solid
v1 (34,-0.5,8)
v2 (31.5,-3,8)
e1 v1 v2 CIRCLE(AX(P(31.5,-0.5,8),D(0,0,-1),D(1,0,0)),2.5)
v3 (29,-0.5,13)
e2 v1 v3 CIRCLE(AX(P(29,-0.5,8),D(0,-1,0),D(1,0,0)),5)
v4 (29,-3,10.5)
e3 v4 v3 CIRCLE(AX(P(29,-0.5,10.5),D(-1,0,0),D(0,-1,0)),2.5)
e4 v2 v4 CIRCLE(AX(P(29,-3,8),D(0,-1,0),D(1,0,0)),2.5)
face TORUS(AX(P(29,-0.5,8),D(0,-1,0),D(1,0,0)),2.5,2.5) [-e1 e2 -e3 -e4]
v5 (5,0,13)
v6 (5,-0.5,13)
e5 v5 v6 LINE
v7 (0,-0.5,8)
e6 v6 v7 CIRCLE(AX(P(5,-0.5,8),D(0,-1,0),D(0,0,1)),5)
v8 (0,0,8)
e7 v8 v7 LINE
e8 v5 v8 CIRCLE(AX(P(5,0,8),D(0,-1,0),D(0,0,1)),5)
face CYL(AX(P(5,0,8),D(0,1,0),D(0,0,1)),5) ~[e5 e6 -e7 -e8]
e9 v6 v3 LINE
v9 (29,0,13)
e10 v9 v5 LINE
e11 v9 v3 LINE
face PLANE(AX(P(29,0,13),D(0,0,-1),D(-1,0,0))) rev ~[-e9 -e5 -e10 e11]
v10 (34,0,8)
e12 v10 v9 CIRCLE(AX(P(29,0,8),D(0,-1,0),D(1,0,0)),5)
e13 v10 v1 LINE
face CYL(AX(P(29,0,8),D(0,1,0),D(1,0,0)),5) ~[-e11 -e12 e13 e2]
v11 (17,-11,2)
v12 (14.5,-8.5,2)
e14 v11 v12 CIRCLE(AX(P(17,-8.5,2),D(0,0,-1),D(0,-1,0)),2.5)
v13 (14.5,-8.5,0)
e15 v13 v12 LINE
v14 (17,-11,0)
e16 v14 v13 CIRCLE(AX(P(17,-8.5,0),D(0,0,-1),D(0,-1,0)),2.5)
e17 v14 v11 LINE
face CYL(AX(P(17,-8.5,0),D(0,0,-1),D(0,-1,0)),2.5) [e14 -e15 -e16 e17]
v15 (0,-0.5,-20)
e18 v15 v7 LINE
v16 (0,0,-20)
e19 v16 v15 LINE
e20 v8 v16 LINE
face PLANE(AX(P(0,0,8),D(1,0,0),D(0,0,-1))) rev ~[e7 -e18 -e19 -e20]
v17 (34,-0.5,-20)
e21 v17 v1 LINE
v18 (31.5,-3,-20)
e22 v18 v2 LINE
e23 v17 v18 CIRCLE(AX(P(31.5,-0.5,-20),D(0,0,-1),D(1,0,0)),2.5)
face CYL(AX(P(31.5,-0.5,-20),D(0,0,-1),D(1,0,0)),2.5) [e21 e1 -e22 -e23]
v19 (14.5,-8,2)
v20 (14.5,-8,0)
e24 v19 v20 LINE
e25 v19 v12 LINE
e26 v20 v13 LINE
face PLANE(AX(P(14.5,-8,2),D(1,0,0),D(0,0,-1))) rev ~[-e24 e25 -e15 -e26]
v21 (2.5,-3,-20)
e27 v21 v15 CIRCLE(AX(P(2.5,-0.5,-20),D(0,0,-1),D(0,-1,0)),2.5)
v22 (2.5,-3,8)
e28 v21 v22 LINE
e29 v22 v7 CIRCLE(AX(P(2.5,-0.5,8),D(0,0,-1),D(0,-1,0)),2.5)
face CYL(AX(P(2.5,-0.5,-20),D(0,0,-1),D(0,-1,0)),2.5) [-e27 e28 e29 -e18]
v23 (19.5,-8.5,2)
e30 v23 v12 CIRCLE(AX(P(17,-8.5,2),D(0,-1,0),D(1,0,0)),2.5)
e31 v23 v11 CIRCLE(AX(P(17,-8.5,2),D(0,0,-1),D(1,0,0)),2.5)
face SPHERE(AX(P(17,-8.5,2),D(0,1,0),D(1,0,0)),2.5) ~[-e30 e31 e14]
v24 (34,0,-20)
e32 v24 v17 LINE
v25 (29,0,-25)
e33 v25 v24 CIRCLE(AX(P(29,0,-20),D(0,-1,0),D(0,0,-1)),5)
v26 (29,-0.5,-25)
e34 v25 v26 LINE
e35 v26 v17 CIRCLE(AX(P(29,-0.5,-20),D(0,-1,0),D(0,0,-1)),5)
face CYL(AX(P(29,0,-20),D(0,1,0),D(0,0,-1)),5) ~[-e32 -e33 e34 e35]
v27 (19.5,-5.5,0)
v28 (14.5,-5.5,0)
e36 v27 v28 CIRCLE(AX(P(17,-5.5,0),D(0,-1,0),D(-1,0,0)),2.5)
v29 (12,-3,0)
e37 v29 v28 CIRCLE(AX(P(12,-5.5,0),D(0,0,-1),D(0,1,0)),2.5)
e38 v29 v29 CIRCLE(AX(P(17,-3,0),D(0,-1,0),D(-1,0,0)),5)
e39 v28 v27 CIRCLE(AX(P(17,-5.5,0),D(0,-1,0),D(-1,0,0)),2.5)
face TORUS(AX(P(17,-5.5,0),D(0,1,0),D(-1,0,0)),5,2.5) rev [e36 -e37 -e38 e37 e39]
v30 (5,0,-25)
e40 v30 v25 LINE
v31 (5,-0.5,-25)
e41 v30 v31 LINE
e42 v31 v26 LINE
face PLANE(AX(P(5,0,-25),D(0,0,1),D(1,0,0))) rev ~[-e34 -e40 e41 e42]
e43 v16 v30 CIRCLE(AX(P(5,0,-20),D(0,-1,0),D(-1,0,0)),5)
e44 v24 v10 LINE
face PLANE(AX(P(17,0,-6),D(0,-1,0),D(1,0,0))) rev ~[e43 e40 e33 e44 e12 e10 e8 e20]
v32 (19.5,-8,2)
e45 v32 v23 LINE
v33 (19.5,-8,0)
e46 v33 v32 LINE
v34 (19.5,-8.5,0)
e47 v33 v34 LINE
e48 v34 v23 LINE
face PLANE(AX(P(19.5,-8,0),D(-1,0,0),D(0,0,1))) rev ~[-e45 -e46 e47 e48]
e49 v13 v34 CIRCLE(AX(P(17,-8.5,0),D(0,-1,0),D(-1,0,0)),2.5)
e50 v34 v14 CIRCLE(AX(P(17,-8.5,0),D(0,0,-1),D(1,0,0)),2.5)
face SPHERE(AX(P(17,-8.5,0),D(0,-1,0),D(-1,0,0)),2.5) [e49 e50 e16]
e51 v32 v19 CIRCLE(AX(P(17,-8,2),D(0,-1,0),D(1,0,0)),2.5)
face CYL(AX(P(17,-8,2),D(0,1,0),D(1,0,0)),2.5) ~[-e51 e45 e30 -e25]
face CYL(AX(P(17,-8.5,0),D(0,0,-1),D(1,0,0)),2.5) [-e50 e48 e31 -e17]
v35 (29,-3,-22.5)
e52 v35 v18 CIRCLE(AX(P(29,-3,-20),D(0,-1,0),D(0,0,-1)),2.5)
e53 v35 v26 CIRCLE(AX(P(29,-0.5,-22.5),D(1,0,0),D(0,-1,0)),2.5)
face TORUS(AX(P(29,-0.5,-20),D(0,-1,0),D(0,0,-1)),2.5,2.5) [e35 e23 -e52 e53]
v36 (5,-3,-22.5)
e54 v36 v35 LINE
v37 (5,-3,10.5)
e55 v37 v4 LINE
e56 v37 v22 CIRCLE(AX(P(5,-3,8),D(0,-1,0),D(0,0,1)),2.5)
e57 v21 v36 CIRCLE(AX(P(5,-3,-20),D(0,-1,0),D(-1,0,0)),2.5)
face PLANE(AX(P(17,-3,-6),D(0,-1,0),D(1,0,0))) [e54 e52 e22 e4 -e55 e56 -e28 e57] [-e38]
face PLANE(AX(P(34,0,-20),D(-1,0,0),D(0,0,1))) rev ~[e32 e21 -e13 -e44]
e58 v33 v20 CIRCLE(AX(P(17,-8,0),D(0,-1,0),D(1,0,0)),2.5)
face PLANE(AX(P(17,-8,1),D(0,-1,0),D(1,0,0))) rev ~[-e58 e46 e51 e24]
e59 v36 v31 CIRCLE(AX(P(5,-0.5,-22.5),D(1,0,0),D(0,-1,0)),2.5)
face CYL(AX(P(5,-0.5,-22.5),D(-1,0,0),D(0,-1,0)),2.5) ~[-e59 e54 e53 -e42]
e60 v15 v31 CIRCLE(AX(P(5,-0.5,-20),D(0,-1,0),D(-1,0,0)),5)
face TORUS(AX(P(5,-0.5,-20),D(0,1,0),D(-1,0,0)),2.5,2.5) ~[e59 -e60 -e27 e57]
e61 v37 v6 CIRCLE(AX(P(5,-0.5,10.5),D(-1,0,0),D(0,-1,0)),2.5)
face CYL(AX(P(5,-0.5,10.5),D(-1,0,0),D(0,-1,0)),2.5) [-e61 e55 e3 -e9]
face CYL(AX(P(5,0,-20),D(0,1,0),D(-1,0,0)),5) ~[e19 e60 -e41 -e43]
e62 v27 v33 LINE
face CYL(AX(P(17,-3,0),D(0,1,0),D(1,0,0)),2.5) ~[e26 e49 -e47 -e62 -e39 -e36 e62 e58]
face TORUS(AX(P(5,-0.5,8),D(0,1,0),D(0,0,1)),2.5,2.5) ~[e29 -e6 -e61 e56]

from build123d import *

# Parameters (mm, degrees)
F1_DEPTH     = 3
F3_DEPTH     = 5
F5_DEPTH     = 3
F6_T3_DEPTH  = 28
F6_T5_DEPTH  = 24
F6_T7_DEPTH  = 2
F6_T10_ANGLE = 180
F6_T12_ANGLE = 90
F6_T14_ANGLE = 90
F6_T16_ANGLE = 90
F6_T18_ANGLE = 90
F6_T20_ANGLE = 180


# Not quite as in the source:
# - a fillet or chamfer that OpenCascade refuses, or shapes differently, is made with other operations: its cross-section is extruded or revolved along the edge and cut away or added


with BuildPart() as f1:
    # F0 (on Front) → F1 (new body)
    with BuildSketch(Plane.XZ):
        with BuildLine():
            Line((29, 13), (5, 13))
            ThreePointArc((5, 13), (1.4644660941, 11.5355339059), (0, 8))
            Line((0, 8), (0, -20))
            ThreePointArc((0, -20), (1.4644660941, -23.5355339059), (5, -25))
            Line((5, -25), (29, -25))
            ThreePointArc((29, -25), (32.5355339059, -23.5355339059), (34, -20))
            Line((34, -20), (34, 8))
            ThreePointArc((34, 8), (32.5355339059, 11.5355339059), (29, 13))
        make_face()
    extrude(amount=F1_DEPTH)

    # F2 (on face) → F3 (join)
    with BuildSketch(Plane.XZ.offset(3)):
        with BuildLine():
            ThreePointArc((14.5, 0), (17, -2.5), (19.5, 0))
            ThreePointArc((19.5, 0), (17, 2.5), (14.5, 0))
        make_face()
    extrude(amount=F3_DEPTH)

    # F4 (on face) → F5 (join)
    with BuildSketch(Plane.XZ.offset(8)):
        with BuildLine():
            Line((19.5, 0), (19.5, 2))
            ThreePointArc((19.5, 2), (17, 4.5), (14.5, 2))
            Line((14.5, 2), (14.5, 0))
            ThreePointArc((14.5, 0), (17, -2.5), (19.5, 0))
        make_face()
    extrude(amount=F5_DEPTH)

    # F6: fillet of radius 2.5 on 13 edges, made by hand

    # F6_s1 → F6_t2 (revolve)
    with BuildSketch(Plane.XY):
        with BuildLine():
            ThreePointArc((12, -3), (13.767766953, -3.732233047), (14.5, -5.5))
            Line((14.5, -5.5), (14.5, -3))
            Line((14.5, -3), (12, -3))
        make_face()
    revolve(axis=Axis((17, -3, 0), (0, -1, 0)))

    # F6_s4 → F6_t3 (cut)
    with BuildSketch(Plane.XY.offset(-20)):
        with BuildLine():
            ThreePointArc((34, -0.5), (33.267766953, -2.267766953), (31.5, -3))
            Line((31.5, -3), (34, -3))
            Line((34, -3), (34, -0.5))
        make_face()
        with BuildLine():
            ThreePointArc((2.5, -3), (0.732233047, -2.267766953), (0, -0.5))
            Line((0, -0.5), (0, -3))
            Line((0, -3), (2.5, -3))
        make_face()
    extrude(amount=F6_T3_DEPTH, mode=Mode.SUBTRACT)

    # F6_s6 → F6_t5 (cut)
    with BuildSketch(Plane.YZ.offset(5)):
        with BuildLine():
            ThreePointArc((-3, -22.5), (-2.267766953, -24.267766953), (-0.5, -25))
            Line((-0.5, -25), (-3, -25))
            Line((-3, -25), (-3, -22.5))
        make_face()
        with BuildLine():
            ThreePointArc((-3, 10.5), (-2.267766953, 12.267766953), (-0.5, 13))
            Line((-0.5, 13), (-3, 13))
            Line((-3, 13), (-3, 10.5))
        make_face()
    extrude(amount=F6_T5_DEPTH, mode=Mode.SUBTRACT)

    # F6_s8 → F6_t7 (cut)
    with BuildSketch(Plane.XY):
        with BuildLine():
            ThreePointArc((19.5, -8.5), (18.767766953, -10.267766953), (17, -11))
            Line((17, -11), (19.5, -11))
            Line((19.5, -11), (19.5, -8.5))
        make_face()
        with BuildLine():
            ThreePointArc((17, -11), (15.232233047, -10.267766953), (14.5, -8.5))
            Line((14.5, -8.5), (14.5, -11))
            Line((14.5, -11), (17, -11))
        make_face()
    extrude(amount=F6_T7_DEPTH, mode=Mode.SUBTRACT)

    # F6_s9 → F6_t10 (revolve, cut)
    with BuildSketch(Plane.XY):
        with BuildLine():
            ThreePointArc((14.5, -8.5), (15.232233047, -10.267766953), (17, -11))
            Line((17, -11), (14.5, -11))
            Line((14.5, -11), (14.5, -8.5))
        make_face()
    revolve(axis=Axis((17, -11, 0), (0, -1, 0)), revolution_arc=F6_T10_ANGLE, mode=Mode.SUBTRACT)

    # F6_s11 → F6_t12 (revolve, cut)
    with BuildSketch(Plane.YZ.offset(29)):
        with BuildLine():
            ThreePointArc((-0.5, -25), (-2.267766953, -24.267766953), (-3, -22.5))
            Line((-3, -22.5), (-3, -25))
            Line((-3, -25), (-0.5, -25))
        make_face()
    revolve(axis=Axis((29, -3, -20), (0, -1, 0)), revolution_arc=F6_T12_ANGLE, mode=Mode.SUBTRACT)

    # F6_s13 → F6_t14 (revolve, cut)
    with BuildSketch(Plane.XY.offset(8)):
        with BuildLine():
            ThreePointArc((34, -0.5), (33.267766953, -2.267766953), (31.5, -3))
            Line((31.5, -3), (34, -3))
            Line((34, -3), (34, -0.5))
        make_face()
    revolve(axis=Axis((29, -3, 8), (0, -1, 0)), revolution_arc=F6_T14_ANGLE, mode=Mode.SUBTRACT)

    # F6_s15 → F6_t16 (revolve, cut)
    with BuildSketch(Plane.XY.offset(-20)):
        with BuildLine():
            ThreePointArc((2.5, -3), (0.732233047, -2.267766953), (0, -0.5))
            Line((0, -0.5), (0, -3))
            Line((0, -3), (2.5, -3))
        make_face()
    revolve(axis=Axis((5, -3, -20), (0, -1, 0)), revolution_arc=F6_T16_ANGLE, mode=Mode.SUBTRACT)

    # F6_s17 → F6_t18 (revolve, cut)
    with BuildSketch(Plane.YZ.offset(5)):
        with BuildLine():
            ThreePointArc((-3, 10.5), (-2.267766953, 12.267766953), (-0.5, 13))
            Line((-0.5, 13), (-3, 13))
            Line((-3, 13), (-3, 10.5))
        make_face()
    revolve(axis=Axis((5, -3, 8), (0, -1, 0)), revolution_arc=F6_T18_ANGLE, mode=Mode.SUBTRACT)

    # F6_s19 → F6_t20 (revolve, cut)
    with BuildSketch(Plane.XY.offset(2)):
        with BuildLine():
            ThreePointArc((17, -11), (18.767766953, -10.267766953), (19.5, -8.5))
            Line((19.5, -8.5), (19.5, -11))
            Line((19.5, -11), (17, -11))
        make_face()
    revolve(axis=Axis((17, -11, 2), (0, -1, 0)), revolution_arc=F6_T20_ANGLE, mode=Mode.SUBTRACT)


solid = f1.part
